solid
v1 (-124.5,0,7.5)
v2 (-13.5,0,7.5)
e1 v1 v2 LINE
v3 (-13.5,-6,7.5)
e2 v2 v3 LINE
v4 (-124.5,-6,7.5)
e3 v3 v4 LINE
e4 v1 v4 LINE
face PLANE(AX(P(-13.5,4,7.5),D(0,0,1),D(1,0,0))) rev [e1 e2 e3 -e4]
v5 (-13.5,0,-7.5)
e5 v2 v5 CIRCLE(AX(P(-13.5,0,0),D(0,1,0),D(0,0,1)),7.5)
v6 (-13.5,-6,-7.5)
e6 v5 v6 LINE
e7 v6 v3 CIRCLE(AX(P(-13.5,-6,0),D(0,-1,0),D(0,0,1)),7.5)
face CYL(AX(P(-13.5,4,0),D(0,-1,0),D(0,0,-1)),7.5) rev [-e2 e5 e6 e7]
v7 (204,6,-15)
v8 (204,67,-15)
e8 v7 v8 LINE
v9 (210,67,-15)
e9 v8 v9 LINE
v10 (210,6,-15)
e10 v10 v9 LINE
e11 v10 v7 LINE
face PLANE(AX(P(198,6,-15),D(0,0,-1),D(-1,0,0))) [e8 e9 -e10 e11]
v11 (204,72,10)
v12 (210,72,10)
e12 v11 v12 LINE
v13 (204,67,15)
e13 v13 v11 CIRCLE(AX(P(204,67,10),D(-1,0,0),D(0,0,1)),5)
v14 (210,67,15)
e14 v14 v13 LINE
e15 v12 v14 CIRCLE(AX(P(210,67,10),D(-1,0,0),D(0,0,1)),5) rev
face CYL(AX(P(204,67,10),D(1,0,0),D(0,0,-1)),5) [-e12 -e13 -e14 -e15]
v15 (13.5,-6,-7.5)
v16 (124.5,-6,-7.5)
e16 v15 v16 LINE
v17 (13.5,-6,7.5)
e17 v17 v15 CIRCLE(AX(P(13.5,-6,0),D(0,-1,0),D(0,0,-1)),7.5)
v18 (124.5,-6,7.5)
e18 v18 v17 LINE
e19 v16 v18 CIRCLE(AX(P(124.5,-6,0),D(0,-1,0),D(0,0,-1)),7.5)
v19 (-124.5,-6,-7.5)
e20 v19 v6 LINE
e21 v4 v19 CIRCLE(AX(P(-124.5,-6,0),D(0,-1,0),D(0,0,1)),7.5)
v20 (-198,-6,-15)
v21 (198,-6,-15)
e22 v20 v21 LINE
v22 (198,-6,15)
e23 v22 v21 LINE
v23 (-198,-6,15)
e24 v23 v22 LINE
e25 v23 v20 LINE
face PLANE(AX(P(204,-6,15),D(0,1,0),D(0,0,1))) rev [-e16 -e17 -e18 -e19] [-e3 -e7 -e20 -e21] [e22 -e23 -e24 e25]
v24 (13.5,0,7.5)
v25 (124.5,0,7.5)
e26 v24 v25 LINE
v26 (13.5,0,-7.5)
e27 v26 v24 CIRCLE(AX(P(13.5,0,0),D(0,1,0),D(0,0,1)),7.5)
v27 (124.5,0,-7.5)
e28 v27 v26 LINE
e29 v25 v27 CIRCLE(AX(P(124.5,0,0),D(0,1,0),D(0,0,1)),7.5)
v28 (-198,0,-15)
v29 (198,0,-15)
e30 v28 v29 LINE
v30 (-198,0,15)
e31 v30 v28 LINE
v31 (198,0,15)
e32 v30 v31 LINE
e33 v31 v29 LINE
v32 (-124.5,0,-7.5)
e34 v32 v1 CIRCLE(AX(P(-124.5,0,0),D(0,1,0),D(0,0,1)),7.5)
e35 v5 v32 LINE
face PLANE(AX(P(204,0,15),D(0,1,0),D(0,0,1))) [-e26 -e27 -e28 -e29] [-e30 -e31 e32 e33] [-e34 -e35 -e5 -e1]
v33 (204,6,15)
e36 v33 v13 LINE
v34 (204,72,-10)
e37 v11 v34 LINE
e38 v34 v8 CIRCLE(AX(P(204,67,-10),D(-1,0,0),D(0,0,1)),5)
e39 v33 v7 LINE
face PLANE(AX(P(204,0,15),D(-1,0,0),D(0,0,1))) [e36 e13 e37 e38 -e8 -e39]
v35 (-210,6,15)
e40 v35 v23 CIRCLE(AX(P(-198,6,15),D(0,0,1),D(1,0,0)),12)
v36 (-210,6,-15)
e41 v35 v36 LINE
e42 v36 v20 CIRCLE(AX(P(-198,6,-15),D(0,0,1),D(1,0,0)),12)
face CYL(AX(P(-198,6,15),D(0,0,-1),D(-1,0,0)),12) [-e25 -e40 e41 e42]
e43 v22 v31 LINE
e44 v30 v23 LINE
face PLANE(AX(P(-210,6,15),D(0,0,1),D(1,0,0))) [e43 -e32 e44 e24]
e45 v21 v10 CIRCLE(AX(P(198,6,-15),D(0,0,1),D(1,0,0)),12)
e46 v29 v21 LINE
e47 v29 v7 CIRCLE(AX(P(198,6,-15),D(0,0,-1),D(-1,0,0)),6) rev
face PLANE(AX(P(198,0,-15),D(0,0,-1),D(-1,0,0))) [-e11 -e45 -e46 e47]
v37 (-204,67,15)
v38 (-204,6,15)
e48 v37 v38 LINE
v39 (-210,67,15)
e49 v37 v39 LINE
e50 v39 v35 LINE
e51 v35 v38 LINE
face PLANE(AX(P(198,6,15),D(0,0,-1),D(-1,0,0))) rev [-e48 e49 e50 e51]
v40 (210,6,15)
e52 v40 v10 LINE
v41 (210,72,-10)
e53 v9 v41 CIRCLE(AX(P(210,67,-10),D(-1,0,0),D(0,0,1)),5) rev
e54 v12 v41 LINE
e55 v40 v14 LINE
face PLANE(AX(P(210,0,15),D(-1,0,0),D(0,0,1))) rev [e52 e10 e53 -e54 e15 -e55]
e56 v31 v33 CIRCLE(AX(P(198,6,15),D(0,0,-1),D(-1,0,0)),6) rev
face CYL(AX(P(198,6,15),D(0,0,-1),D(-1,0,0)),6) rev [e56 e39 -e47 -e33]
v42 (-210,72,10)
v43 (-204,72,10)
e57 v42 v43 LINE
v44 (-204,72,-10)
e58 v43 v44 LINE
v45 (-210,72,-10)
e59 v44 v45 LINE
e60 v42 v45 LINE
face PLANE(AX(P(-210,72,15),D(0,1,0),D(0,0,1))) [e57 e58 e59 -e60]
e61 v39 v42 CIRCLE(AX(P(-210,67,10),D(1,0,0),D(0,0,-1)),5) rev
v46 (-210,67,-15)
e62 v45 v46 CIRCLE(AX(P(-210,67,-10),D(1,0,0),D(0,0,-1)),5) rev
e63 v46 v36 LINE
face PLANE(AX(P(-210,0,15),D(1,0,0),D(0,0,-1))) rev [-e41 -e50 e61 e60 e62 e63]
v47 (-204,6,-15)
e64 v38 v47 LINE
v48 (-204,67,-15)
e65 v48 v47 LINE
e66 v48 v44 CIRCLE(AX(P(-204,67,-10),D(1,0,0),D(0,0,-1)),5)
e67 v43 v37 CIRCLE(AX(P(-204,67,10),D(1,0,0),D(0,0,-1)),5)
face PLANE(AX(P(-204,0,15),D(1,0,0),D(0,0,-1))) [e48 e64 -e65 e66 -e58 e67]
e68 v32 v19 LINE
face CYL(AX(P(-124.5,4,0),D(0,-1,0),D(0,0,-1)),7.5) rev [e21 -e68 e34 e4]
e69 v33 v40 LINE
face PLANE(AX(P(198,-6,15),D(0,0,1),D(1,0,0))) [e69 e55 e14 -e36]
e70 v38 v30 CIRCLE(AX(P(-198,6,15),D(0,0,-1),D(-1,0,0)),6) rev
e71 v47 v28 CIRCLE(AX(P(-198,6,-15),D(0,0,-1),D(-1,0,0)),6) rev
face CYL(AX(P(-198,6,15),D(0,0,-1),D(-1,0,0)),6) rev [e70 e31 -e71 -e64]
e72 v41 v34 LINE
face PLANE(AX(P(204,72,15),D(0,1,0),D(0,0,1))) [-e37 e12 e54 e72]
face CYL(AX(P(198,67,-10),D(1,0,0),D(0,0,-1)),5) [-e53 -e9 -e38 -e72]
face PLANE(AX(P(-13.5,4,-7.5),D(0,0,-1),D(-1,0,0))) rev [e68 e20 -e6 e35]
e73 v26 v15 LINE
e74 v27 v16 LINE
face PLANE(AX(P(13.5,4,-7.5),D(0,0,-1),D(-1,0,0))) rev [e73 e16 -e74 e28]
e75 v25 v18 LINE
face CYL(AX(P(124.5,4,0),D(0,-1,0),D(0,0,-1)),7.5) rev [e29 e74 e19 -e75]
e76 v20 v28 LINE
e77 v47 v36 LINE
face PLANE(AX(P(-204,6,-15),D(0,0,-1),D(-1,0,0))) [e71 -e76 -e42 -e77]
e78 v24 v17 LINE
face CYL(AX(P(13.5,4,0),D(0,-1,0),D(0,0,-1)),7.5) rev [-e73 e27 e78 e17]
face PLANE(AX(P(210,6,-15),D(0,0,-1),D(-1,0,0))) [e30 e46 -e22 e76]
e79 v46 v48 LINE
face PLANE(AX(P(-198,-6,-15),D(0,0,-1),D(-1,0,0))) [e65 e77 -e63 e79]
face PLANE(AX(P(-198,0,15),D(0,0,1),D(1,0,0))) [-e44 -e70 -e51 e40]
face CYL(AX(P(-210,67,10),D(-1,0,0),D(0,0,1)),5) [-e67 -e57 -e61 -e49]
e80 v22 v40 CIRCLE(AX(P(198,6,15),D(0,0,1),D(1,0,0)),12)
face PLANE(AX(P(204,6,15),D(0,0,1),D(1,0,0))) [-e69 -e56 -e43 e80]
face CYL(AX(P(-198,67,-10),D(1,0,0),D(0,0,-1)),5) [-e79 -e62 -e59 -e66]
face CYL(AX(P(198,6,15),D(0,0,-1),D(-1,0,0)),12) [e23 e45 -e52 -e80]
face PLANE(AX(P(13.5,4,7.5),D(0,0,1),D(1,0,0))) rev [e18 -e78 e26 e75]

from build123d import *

# Parameters (mm, degrees)
SM_BASE_FLANGE_1_DEPTH = 15
CUT_EXTRUDE_1_DEPTH    = 10
FILLET_1_R             = 5


# Sheet-metal steps are written as plain solids
with BuildPart() as part:
    # Sketch 1 → 基体-法兰1 (new, symmetric)
    with BuildSketch(Plane.XY):
        with BuildLine():
            Line((204, 72), (204, 6))
            ThreePointArc((204, 6), (202.242640687, 1.757359313), (198, 0))
            Line((198, 0), (-198, 0))
            ThreePointArc((-198, 0), (-202.242640687, 1.757359313), (-204, 6))
            Line((-204, 6), (-204, 72))
            Line((-204, 72), (-210, 72))
            Line((-210, 72), (-210, 6))
            ThreePointArc((-210, 6), (-206.485281374, -2.485281374), (-198, -6))
            Line((-198, -6), (198, -6))
            ThreePointArc((198, -6), (206.485281374, -2.485281374), (210, 6))
            Line((210, 6), (210, 72))
            Line((210, 72), (204, 72))
        make_face()
    extrude(amount=SM_BASE_FLANGE_1_DEPTH, both=True)

    # 草图6 → 切除-拉伸1 (cut)
    with BuildSketch(Plane.XZ.offset(6)):
        with BuildLine():
            Line((13.5, 7.5), (124.5, 7.5))
            ThreePointArc((124.5, 7.5), (132, 0), (124.5, -7.5))
            Line((124.5, -7.5), (13.5, -7.5))
            ThreePointArc((13.5, -7.5), (6, 0), (13.5, 7.5))
        make_face()
        with BuildLine():
            Line((-13.5, 7.5), (-124.5, 7.5))
            ThreePointArc((-124.5, 7.5), (-132, 0), (-124.5, -7.5))
            Line((-124.5, -7.5), (-13.5, -7.5))
            ThreePointArc((-13.5, -7.5), (-6, 0), (-13.5, 7.5))
        make_face()
    extrude(amount=-CUT_EXTRUDE_1_DEPTH, mode=Mode.SUBTRACT)

    # 圆角1
    fillet_1_edges = [part.edges().sort_by_distance(p)[0] for p in [
        (-207, 72, -15),
        (207, 72, -15),
        (-207, 72, 15),
        (207, 72, 15),
    ]]
    fillet(fillet_1_edges, radius=FILLET_1_R)


solid = part.part
